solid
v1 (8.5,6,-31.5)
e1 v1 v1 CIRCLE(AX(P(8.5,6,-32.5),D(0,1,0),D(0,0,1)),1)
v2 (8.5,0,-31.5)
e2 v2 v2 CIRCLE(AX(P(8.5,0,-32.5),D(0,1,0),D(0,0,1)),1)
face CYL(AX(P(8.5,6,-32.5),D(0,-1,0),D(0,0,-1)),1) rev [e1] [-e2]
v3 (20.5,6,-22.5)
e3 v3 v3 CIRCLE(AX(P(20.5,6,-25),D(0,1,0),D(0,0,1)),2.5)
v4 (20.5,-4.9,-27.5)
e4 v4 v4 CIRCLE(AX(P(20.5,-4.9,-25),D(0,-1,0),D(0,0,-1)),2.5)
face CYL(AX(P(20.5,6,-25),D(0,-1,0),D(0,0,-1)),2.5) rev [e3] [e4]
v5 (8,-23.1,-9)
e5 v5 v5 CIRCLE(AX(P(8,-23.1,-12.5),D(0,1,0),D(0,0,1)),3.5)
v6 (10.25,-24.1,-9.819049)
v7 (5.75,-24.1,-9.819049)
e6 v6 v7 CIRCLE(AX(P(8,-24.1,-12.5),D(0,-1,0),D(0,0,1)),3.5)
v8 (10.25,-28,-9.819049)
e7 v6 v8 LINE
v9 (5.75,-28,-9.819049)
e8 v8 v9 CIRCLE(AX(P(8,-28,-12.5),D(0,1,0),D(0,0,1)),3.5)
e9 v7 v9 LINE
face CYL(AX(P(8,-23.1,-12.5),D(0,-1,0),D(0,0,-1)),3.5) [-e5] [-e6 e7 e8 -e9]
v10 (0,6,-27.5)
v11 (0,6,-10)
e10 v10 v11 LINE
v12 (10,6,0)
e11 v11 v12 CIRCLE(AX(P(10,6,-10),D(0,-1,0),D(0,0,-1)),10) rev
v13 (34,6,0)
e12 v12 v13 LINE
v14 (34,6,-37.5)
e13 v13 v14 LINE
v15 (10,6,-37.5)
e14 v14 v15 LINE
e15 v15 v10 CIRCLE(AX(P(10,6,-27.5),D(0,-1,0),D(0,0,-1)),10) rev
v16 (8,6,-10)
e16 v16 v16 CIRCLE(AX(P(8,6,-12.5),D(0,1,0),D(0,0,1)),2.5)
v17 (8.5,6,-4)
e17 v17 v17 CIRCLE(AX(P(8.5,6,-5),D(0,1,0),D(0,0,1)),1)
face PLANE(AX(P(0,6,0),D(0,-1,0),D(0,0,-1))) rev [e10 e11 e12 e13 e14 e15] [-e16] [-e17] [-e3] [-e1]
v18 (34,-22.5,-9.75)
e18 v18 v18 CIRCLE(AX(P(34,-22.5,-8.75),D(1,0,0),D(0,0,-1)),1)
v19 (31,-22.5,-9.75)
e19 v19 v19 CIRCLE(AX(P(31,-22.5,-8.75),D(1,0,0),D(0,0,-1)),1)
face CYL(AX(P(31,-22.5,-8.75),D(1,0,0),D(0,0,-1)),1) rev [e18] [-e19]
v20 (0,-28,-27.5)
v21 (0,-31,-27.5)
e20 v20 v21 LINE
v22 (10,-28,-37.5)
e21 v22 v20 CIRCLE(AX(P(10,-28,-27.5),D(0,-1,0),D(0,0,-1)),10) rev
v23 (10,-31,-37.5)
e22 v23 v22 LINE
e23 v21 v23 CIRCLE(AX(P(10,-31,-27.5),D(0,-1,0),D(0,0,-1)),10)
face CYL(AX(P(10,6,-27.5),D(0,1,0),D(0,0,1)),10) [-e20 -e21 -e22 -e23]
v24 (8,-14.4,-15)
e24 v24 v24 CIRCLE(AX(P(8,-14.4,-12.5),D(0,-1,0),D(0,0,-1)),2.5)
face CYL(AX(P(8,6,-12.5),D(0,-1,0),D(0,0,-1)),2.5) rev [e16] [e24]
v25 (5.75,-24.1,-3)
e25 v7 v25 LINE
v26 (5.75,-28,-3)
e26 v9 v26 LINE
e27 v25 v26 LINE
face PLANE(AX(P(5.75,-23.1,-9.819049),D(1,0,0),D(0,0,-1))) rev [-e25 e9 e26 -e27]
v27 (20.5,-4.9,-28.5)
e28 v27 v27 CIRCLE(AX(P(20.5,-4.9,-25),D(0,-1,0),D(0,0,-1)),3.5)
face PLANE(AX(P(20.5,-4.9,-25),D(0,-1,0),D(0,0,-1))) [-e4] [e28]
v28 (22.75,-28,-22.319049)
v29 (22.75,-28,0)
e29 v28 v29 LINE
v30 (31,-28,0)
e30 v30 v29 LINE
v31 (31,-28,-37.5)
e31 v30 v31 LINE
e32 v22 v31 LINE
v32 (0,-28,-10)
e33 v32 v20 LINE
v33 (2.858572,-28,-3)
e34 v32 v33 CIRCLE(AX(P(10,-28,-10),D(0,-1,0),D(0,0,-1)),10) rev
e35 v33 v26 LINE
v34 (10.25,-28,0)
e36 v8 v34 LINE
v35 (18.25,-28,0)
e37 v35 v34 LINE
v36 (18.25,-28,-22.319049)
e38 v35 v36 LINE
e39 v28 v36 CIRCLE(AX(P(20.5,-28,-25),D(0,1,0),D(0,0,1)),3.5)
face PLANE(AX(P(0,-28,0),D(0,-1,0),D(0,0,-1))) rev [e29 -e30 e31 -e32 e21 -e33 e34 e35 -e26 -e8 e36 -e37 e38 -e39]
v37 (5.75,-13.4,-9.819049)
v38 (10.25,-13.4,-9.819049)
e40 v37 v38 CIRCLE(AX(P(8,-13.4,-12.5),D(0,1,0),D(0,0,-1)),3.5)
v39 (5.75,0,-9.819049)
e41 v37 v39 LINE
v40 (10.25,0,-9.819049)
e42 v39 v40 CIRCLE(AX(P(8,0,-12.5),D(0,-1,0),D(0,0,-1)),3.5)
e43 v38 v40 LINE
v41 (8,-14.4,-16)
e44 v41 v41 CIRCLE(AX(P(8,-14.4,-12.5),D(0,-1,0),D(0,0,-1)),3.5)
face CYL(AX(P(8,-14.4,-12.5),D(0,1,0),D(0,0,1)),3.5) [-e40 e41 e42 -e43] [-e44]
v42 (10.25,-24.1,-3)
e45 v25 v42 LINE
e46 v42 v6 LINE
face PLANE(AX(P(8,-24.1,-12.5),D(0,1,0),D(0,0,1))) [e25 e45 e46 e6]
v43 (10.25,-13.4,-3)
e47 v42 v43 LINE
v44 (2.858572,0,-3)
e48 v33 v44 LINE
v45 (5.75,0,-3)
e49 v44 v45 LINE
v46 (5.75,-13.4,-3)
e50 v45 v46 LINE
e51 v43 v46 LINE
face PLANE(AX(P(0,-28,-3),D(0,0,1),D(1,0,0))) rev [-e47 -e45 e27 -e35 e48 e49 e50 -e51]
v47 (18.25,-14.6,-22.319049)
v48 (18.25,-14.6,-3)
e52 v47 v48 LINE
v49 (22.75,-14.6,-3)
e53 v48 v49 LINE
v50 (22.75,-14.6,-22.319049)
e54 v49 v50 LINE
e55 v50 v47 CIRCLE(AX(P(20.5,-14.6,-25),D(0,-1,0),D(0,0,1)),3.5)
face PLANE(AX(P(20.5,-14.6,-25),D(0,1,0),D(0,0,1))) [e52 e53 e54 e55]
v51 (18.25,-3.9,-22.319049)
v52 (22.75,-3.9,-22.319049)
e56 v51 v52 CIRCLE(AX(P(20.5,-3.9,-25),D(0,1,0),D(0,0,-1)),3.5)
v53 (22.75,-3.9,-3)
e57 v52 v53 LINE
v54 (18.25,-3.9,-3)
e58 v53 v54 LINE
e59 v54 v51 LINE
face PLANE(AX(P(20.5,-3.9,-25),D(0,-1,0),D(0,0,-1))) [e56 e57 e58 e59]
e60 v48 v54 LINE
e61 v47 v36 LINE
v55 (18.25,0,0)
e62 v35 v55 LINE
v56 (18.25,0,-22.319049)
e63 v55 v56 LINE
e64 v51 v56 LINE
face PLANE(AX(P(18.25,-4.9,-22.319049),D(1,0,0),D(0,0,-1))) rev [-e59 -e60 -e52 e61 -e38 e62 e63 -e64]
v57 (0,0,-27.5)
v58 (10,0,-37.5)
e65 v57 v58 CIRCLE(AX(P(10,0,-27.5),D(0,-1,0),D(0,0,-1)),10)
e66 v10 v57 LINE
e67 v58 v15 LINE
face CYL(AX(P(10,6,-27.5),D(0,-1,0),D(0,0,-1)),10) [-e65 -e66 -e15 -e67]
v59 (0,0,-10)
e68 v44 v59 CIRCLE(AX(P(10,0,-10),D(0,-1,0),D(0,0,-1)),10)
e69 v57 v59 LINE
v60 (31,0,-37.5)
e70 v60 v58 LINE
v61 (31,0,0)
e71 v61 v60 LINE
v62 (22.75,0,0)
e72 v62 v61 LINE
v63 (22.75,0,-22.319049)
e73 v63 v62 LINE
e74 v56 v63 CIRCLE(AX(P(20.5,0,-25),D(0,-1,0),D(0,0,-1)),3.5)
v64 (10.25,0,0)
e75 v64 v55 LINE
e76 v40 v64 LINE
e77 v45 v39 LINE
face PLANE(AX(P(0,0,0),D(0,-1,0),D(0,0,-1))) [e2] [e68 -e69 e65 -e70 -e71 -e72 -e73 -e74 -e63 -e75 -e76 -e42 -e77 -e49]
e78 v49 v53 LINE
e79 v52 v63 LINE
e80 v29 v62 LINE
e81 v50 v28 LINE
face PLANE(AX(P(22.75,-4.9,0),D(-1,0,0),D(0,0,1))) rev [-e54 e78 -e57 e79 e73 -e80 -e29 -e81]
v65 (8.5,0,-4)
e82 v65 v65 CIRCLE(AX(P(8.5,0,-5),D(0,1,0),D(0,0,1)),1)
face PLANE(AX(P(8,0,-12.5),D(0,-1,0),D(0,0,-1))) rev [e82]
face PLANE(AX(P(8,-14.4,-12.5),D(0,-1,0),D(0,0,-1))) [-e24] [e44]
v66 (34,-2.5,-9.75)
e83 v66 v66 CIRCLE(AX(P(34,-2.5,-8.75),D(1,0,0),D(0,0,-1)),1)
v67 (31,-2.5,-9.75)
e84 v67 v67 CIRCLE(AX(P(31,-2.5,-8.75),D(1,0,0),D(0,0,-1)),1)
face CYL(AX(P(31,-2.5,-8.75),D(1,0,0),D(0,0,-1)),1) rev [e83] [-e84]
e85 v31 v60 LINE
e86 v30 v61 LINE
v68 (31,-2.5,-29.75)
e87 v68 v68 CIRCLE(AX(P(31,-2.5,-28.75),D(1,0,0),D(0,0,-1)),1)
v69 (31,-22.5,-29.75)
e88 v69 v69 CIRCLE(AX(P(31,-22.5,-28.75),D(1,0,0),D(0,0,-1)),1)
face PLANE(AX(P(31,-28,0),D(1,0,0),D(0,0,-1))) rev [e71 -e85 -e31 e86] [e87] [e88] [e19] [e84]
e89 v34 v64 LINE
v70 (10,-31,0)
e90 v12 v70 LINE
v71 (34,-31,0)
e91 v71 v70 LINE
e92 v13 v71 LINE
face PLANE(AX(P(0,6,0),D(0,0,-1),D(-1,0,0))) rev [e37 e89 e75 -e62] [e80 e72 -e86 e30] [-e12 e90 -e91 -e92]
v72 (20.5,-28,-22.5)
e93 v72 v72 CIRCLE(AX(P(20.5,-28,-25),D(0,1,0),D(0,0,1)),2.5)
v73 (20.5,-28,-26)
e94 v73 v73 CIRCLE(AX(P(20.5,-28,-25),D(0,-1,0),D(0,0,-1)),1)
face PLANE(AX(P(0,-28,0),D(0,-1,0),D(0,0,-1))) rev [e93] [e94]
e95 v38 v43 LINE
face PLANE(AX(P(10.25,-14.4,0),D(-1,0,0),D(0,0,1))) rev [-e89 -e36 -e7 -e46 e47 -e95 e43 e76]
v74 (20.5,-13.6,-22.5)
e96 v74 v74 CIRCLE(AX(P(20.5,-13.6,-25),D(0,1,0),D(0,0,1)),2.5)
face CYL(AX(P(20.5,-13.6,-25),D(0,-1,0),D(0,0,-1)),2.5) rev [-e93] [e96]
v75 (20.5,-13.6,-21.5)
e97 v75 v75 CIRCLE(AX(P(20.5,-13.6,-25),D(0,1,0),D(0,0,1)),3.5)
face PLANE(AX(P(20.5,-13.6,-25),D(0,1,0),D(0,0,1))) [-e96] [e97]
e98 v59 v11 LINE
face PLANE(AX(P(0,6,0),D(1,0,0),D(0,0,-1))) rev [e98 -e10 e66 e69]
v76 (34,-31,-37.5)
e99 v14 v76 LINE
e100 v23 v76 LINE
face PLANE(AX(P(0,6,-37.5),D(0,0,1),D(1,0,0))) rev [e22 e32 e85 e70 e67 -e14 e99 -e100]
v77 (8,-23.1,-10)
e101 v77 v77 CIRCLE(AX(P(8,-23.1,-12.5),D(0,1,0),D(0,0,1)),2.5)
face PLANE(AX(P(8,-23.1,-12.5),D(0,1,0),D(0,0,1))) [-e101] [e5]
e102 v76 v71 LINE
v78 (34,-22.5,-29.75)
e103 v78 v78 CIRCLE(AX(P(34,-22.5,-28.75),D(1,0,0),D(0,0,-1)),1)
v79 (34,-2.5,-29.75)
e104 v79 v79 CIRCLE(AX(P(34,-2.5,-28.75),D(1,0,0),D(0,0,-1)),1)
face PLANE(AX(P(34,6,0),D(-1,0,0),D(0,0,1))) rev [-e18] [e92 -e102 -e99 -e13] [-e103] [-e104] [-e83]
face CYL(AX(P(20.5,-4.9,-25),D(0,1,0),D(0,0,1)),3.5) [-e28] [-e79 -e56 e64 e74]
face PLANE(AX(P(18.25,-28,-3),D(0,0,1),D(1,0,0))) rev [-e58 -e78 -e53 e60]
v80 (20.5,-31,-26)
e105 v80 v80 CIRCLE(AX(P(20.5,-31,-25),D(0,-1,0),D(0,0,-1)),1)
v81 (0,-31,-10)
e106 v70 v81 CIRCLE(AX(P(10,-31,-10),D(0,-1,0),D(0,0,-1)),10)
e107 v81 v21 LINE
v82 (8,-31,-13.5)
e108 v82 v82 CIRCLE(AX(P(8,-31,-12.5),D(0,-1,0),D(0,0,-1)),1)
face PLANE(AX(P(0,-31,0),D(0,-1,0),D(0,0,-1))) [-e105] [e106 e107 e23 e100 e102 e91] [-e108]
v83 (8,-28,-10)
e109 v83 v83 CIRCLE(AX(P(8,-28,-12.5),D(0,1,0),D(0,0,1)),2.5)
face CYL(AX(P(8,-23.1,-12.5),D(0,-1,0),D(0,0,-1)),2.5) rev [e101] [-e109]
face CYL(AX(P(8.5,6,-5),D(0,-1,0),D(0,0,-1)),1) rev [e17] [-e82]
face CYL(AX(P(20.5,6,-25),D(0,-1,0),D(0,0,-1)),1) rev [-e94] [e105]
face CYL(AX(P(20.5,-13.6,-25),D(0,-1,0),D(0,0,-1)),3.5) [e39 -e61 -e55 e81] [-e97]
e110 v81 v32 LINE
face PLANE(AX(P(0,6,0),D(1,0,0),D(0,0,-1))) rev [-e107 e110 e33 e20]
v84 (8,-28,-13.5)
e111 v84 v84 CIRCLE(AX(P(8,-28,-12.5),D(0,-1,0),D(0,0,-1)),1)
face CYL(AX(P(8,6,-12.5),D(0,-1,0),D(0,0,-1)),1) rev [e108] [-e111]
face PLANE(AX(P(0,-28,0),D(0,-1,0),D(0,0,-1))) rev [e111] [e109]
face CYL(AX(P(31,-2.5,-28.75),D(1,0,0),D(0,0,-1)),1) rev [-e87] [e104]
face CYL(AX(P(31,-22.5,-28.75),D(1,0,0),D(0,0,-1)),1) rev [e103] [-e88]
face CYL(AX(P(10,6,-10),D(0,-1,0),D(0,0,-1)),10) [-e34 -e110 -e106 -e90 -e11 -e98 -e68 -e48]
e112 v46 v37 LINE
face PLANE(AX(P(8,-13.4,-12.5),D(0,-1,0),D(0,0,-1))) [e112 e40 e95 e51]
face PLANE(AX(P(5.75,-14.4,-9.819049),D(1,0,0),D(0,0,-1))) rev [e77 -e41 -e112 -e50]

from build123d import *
from build123d.topology import SkipClean

# Parameters (mm, degrees)
TOP_SKETCH1_W                             = 34
TOP_SKETCH1_H                             = 37.5
TOP_SKETCH1_R                             = 1
TOP_SKETCH1_R_2                           = 2.5
BOSS_EXTRUDE4_DEPTH                       = 6
TOPRIGHTRISERBOSS_EXTRUDE5_START          = 14.4
TOPRIGHTRISER_R                           = 2.5
TOPRIGHTRISERBOSS_EXTRUDE5_DEPTH          = 14.4
TOPLEFTBOSS_EXTRUDE6_START                = 4.9
TOPLEFT_R                                 = 2.5
TOPLEFTBOSS_EXTRUDE6_DEPTH                = 4.9
MIDWALL_W                                 = 10.25
MIDWALL_H                                 = 3
MIDWALL_W_2                               = 4.5
MIDWALL_W_3                               = 3
MIDWALL_H_2                               = 37.5
MIDWALLBOSS_EXTRUDE7_DEPTH                = 28
BOTTOM_W                                  = 34
BOTTOM_H                                  = 37.5
BOTTOMBOSS_EXTRUDE8_DEPTH                 = 3
LOWERRIGHT_R                              = 2.5
LOWERRIGHTBOSS_EXTRUDE10_DEPTH            = 4.9
LOWERLEFT_R                               = 2.5
LOWERLEFTBOSS_EXTRUDE9_DEPTH              = 14.4
FILLET1_R                                 = 10
LINEARRAILMOUNTINGHOLES_SKETCH10_R        = 1
LINEARRAILMOUNTINGHOLESCUT_EXTRUDE1_DEPTH = 3
TOPRIGHTINSET_CUT_EXTRUDE1_DEPTH          = 1
TOPLEFTINSET_CUT_EXTRUDE2_DEPTH           = 1
LOWERLEFTINSET_CUT_EXTRUDE3_START         = -1
LOWERLEFTINSET_CUT_EXTRUDE3_DEPTH         = 1
LOWERRIGHTINSETCUT_EXTRUDE4_START         = -1
LOWERRIGHTINSETCUT_EXTRUDE4_DEPTH         = 1
PUSHPINHOLESKETCH1_R                      = 1
PUSHPINHOLECUT_EXTRUDE5_DEPTH             = 63.69968102


with BuildPart() as part:
    # Top-Sketch1 → Boss-Extrude4 (new body)
    with BuildSketch(Plane(origin=(0, 0, 0), x_dir=(1, 0, 0), z_dir=(0, 1, 0))):
        with Locations((17, 18.75)):
            Rectangle(TOP_SKETCH1_W, TOP_SKETCH1_H)
        with Locations(Location((8.5, 32.5, 0), (0, 0, 270))):
            Circle(TOP_SKETCH1_R, mode=Mode.SUBTRACT)
        with Locations(Location((8.5, 5, 0), (0, 0, 270))):
            Circle(TOP_SKETCH1_R, mode=Mode.SUBTRACT)
        with Locations(Location((8, 12.5, 0), (0, 0, 270))):
            Circle(TOP_SKETCH1_R_2, mode=Mode.SUBTRACT)
        with Locations(Location((20.5, 25, 0), (0, 0, 270))):
            Circle(TOP_SKETCH1_R_2, mode=Mode.SUBTRACT)
    extrude(amount=BOSS_EXTRUDE4_DEPTH)

    # TopRightRiser → TopRightRiserBoss-Extrude5 (add)
    with SkipClean():  # the faces are left unmerged after this step: merging them gives an invalid solid
        with BuildSketch(Plane.XZ.offset(TOPRIGHTRISERBOSS_EXTRUDE5_START)):
            with BuildLine():
                Line((5.75, -9.819048676), (5.75, 0))
                Line((5.75, 0), (10.25, 0))
                Line((10.25, 0), (10.25, -9.819048676))
                ThreePointArc((10.25, -9.819048676), (8, -16), (5.75, -9.819048676))
            make_face()
            with Locations(Location((8, -12.5, 0), (0, 0, 270))):
                Circle(TOPRIGHTRISER_R, mode=Mode.SUBTRACT)
        extrude(amount=-TOPRIGHTRISERBOSS_EXTRUDE5_DEPTH)

    # TopLeft → TopLeftBoss-Extrude6 (add)
    with SkipClean():  # the faces are left unmerged after this step: merging them gives an invalid solid
        with BuildSketch(Plane.XZ.offset(TOPLEFTBOSS_EXTRUDE6_START)):
            with BuildLine():
                Line((18.25, -22.319048676), (18.25, 0))
                Line((18.25, 0), (22.75, 0))
                Line((22.75, 0), (22.75, -22.319048676))
                ThreePointArc((22.75, -22.319048676), (20.5, -28.5), (18.25, -22.319048676))
            make_face()
            with Locations(Location((20.5, -25, 0), (0, 0, 270))):
                Circle(TOPLEFT_R, mode=Mode.SUBTRACT)
        extrude(amount=-TOPLEFTBOSS_EXTRUDE6_DEPTH)

    # MidWall → MidWallBoss-Extrude7 (add)
    with SkipClean():  # the faces are left unmerged after this step: merging them gives an invalid solid
        with BuildSketch(Plane(origin=(0, 0, 0), x_dir=(-1, 0, 0), z_dir=(0, -1, 0))):
            with Locations((-5.125, 1.5)):
                Rectangle(MIDWALL_W, MIDWALL_H)
            with Locations((-20.5, 1.5)):
                Rectangle(MIDWALL_W_2, MIDWALL_H)
            with Locations((-32.5, 18.75)):
                Rectangle(MIDWALL_W_3, MIDWALL_H_2)
        extrude(amount=MIDWALLBOSS_EXTRUDE7_DEPTH)

    # Bottom → BottomBoss-Extrude8 (add)
    with SkipClean():  # the faces are left unmerged after this step: merging them gives an invalid solid
        with BuildSketch(Plane.XZ.offset(28)):
            with Locations((17, -18.75)):
                Rectangle(BOTTOM_W, BOTTOM_H)
        extrude(amount=BOTTOMBOSS_EXTRUDE8_DEPTH)

    # LowerRight → LowerRightBoss-Extrude10 (add)
    with SkipClean():  # the faces are left unmerged after this step: merging them gives an invalid solid
        with BuildSketch(Plane(origin=(0, -28, 0), x_dir=(1, 0, 0), z_dir=(0, 1, 0))):
            with BuildLine():
                Line((5.75, 9.819048676), (5.75, 3))
                Line((5.75, 3), (10.25, 3))
                Line((10.25, 3), (10.25, 9.819048676))
                ThreePointArc((10.25, 9.819048676), (8, 16), (5.75, 9.819048676))
            make_face()
            with Locations(Location((8, 12.5, 0), (0, 0, 90))):
                Circle(LOWERRIGHT_R, mode=Mode.SUBTRACT)
        extrude(amount=LOWERRIGHTBOSS_EXTRUDE10_DEPTH)

    # LowerLeft → LowerLeftBoss-Extrude9 (add)
    with SkipClean():  # the faces are left unmerged after this step: merging them gives an invalid solid
        with BuildSketch(Plane(origin=(0, -28, 0), x_dir=(1, 0, 0), z_dir=(0, 1, 0))):
            with BuildLine():
                Line((18.25, 0), (22.75, 0))
                Line((22.75, 0), (22.75, 22.319048676))
                ThreePointArc((22.75, 22.319048676), (20.5, 28.5), (18.25, 22.319048676))
                Line((18.25, 22.319048676), (18.25, 0))
            make_face()
            with Locations(Location((20.5, 25, 0), (0, 0, 90))):
                Circle(LOWERLEFT_R, mode=Mode.SUBTRACT)
        extrude(amount=LOWERLEFTBOSS_EXTRUDE9_DEPTH)

    # Fillet1
    # the kernel refuses this fillet: 10 mm, written as the material it takes off along each edge
    with BuildSketch(Plane(origin=(0, 0, 0), x_dir=(1, 0, 0), z_dir=(0, -1, 0)), Plane(origin=(0, -28, 0), x_dir=(1, 0, 0), z_dir=(0, -1, 0))) as fillet1_piece_1:
        with BuildLine():
            CenterArc((FILLET1_R, -FILLET1_R), FILLET1_R, 90, 90)
            Line((0, -FILLET1_R), (0, 0))
            Line((0, 0), (FILLET1_R, 0))
        make_face()
    extrude(amount=28, mode=Mode.SUBTRACT)
    with BuildSketch(Plane(origin=(0, -3, -37.5), x_dir=(0, 0, 1), z_dir=(0, -1, 0))) as fillet1_piece_2:
        with BuildLine():
            CenterArc((FILLET1_R, -FILLET1_R), FILLET1_R, 90, 90)
            Line((0, -FILLET1_R), (0, 0))
            Line((0, 0), (FILLET1_R, 0))
        make_face()
    extrude(amount=53, mode=Mode.SUBTRACT)
    with BuildSketch(Plane(origin=(0, -25, -37.5), x_dir=(0, 0, 1), z_dir=(0, 1, 0))) as fillet1_piece_3:
        with BuildLine():
            CenterArc((FILLET1_R, FILLET1_R), FILLET1_R, 180, 90)
            Line((0, FILLET1_R), (0, 0))
            Line((0, 0), (FILLET1_R, 0))
        make_face()
    extrude(amount=56, mode=Mode.SUBTRACT)
    with BuildSketch(Plane(origin=(0, 0, 0), x_dir=(1, 0, 0), z_dir=(0, 1, 0))) as fillet1_piece_4:
        with BuildLine():
            CenterArc((FILLET1_R, FILLET1_R), FILLET1_R, 180, 90)
            Line((0, FILLET1_R), (0, 0))
            Line((0, 0), (FILLET1_R, 0))
        make_face()
    extrude(amount=31, mode=Mode.SUBTRACT)

    # LinearRailMountingHoles-Sketch10 → LinearRailMountingHolesCut-Extrude1 (cut)
    with BuildSketch(Plane(origin=(34, 0, 0), x_dir=(0, 0, -1), z_dir=(1, 0, 0))):
        with Locations((8.75, -2.5)):
            Circle(LINEARRAILMOUNTINGHOLES_SKETCH10_R)
        with Locations((8.75, -22.5)):
            Circle(LINEARRAILMOUNTINGHOLES_SKETCH10_R)
        with Locations((28.75, -22.5)):
            Circle(LINEARRAILMOUNTINGHOLES_SKETCH10_R)
        with Locations((28.75, -2.5)):
            Circle(LINEARRAILMOUNTINGHOLES_SKETCH10_R)
    extrude(amount=-LINEARRAILMOUNTINGHOLESCUT_EXTRUDE1_DEPTH, mode=Mode.SUBTRACT)

    # TopRightInset-Sketch1 → TopRightInset-Cut-Extrude1 (cut)
    with BuildSketch(Plane.XZ.offset(14.4)):
        with BuildLine():
            Line((5.75, -9.819048676), (5.75, -3))
            Line((5.75, -3), (10.25, -3))
            Line((10.25, -3), (10.25, -9.819048676))
            ThreePointArc((10.25, -9.819048676), (8, -9), (5.75, -9.819048676))
        make_face()
    extrude(amount=-TOPRIGHTINSET_CUT_EXTRUDE1_DEPTH, mode=Mode.SUBTRACT)

    # TopLeftInset-Sketch2 → TopLeftInset-Cut-Extrude2 (cut)
    with BuildSketch(Plane.XZ.offset(4.9)):
        with BuildLine():
            Line((18.25, -22.319048676), (18.25, -3))
            Line((18.25, -3), (22.75, -3))
            Line((22.75, -3), (22.75, -22.319048676))
            ThreePointArc((22.75, -22.319048676), (20.5, -21.5), (18.25, -22.319048676))
        make_face()
    extrude(amount=-TOPLEFTINSET_CUT_EXTRUDE2_DEPTH, mode=Mode.SUBTRACT)

    # LowerLeftInset-Sketch3 → LowerLeftInset-Cut-Extrude3 (cut)
    with BuildSketch(Plane(origin=(0, -13.6, 0), x_dir=(1, 0, 0), z_dir=(0, 1, 0)).offset(LOWERLEFTINSET_CUT_EXTRUDE3_START)):
        with BuildLine():
            Line((18.25, 22.319048676), (18.25, 3))
            Line((18.25, 3), (22.75, 3))
            Line((22.75, 3), (22.75, 22.319048676))
            ThreePointArc((22.75, 22.319048676), (20.5, 21.5), (18.25, 22.319048676))
        make_face()
    extrude(amount=LOWERLEFTINSET_CUT_EXTRUDE3_DEPTH, mode=Mode.SUBTRACT)

    # LowerRightInset-Sketch4 → LowerRightInsetCut-Extrude4 (cut)
    with BuildSketch(Plane(origin=(0, -23.1, 0), x_dir=(1, 0, 0), z_dir=(0, 1, 0)).offset(LOWERRIGHTINSETCUT_EXTRUDE4_START)):
        with BuildLine():
            Line((5.75, 9.819048676), (5.75, 3))
            Line((5.75, 3), (10.25, 3))
            Line((10.25, 3), (10.25, 9.819048676))
            ThreePointArc((10.25, 9.819048676), (8, 9), (5.75, 9.819048676))
        make_face()
    extrude(amount=LOWERRIGHTINSETCUT_EXTRUDE4_DEPTH, mode=Mode.SUBTRACT)

    # PushPinHoleSketch1 → PushPinHoleCut-Extrude5 (cut, through all)
    with BuildSketch(Plane.XZ.offset(31)):
        with Locations(Location((20.5, -25, 0), (0, 0, 270))):
            Circle(PUSHPINHOLESKETCH1_R)
        with Locations(Location((8, -12.5, 0), (0, 0, 270))):
            Circle(PUSHPINHOLESKETCH1_R)
    extrude(amount=-PUSHPINHOLECUT_EXTRUDE5_DEPTH, mode=Mode.SUBTRACT)


solid = part.part
